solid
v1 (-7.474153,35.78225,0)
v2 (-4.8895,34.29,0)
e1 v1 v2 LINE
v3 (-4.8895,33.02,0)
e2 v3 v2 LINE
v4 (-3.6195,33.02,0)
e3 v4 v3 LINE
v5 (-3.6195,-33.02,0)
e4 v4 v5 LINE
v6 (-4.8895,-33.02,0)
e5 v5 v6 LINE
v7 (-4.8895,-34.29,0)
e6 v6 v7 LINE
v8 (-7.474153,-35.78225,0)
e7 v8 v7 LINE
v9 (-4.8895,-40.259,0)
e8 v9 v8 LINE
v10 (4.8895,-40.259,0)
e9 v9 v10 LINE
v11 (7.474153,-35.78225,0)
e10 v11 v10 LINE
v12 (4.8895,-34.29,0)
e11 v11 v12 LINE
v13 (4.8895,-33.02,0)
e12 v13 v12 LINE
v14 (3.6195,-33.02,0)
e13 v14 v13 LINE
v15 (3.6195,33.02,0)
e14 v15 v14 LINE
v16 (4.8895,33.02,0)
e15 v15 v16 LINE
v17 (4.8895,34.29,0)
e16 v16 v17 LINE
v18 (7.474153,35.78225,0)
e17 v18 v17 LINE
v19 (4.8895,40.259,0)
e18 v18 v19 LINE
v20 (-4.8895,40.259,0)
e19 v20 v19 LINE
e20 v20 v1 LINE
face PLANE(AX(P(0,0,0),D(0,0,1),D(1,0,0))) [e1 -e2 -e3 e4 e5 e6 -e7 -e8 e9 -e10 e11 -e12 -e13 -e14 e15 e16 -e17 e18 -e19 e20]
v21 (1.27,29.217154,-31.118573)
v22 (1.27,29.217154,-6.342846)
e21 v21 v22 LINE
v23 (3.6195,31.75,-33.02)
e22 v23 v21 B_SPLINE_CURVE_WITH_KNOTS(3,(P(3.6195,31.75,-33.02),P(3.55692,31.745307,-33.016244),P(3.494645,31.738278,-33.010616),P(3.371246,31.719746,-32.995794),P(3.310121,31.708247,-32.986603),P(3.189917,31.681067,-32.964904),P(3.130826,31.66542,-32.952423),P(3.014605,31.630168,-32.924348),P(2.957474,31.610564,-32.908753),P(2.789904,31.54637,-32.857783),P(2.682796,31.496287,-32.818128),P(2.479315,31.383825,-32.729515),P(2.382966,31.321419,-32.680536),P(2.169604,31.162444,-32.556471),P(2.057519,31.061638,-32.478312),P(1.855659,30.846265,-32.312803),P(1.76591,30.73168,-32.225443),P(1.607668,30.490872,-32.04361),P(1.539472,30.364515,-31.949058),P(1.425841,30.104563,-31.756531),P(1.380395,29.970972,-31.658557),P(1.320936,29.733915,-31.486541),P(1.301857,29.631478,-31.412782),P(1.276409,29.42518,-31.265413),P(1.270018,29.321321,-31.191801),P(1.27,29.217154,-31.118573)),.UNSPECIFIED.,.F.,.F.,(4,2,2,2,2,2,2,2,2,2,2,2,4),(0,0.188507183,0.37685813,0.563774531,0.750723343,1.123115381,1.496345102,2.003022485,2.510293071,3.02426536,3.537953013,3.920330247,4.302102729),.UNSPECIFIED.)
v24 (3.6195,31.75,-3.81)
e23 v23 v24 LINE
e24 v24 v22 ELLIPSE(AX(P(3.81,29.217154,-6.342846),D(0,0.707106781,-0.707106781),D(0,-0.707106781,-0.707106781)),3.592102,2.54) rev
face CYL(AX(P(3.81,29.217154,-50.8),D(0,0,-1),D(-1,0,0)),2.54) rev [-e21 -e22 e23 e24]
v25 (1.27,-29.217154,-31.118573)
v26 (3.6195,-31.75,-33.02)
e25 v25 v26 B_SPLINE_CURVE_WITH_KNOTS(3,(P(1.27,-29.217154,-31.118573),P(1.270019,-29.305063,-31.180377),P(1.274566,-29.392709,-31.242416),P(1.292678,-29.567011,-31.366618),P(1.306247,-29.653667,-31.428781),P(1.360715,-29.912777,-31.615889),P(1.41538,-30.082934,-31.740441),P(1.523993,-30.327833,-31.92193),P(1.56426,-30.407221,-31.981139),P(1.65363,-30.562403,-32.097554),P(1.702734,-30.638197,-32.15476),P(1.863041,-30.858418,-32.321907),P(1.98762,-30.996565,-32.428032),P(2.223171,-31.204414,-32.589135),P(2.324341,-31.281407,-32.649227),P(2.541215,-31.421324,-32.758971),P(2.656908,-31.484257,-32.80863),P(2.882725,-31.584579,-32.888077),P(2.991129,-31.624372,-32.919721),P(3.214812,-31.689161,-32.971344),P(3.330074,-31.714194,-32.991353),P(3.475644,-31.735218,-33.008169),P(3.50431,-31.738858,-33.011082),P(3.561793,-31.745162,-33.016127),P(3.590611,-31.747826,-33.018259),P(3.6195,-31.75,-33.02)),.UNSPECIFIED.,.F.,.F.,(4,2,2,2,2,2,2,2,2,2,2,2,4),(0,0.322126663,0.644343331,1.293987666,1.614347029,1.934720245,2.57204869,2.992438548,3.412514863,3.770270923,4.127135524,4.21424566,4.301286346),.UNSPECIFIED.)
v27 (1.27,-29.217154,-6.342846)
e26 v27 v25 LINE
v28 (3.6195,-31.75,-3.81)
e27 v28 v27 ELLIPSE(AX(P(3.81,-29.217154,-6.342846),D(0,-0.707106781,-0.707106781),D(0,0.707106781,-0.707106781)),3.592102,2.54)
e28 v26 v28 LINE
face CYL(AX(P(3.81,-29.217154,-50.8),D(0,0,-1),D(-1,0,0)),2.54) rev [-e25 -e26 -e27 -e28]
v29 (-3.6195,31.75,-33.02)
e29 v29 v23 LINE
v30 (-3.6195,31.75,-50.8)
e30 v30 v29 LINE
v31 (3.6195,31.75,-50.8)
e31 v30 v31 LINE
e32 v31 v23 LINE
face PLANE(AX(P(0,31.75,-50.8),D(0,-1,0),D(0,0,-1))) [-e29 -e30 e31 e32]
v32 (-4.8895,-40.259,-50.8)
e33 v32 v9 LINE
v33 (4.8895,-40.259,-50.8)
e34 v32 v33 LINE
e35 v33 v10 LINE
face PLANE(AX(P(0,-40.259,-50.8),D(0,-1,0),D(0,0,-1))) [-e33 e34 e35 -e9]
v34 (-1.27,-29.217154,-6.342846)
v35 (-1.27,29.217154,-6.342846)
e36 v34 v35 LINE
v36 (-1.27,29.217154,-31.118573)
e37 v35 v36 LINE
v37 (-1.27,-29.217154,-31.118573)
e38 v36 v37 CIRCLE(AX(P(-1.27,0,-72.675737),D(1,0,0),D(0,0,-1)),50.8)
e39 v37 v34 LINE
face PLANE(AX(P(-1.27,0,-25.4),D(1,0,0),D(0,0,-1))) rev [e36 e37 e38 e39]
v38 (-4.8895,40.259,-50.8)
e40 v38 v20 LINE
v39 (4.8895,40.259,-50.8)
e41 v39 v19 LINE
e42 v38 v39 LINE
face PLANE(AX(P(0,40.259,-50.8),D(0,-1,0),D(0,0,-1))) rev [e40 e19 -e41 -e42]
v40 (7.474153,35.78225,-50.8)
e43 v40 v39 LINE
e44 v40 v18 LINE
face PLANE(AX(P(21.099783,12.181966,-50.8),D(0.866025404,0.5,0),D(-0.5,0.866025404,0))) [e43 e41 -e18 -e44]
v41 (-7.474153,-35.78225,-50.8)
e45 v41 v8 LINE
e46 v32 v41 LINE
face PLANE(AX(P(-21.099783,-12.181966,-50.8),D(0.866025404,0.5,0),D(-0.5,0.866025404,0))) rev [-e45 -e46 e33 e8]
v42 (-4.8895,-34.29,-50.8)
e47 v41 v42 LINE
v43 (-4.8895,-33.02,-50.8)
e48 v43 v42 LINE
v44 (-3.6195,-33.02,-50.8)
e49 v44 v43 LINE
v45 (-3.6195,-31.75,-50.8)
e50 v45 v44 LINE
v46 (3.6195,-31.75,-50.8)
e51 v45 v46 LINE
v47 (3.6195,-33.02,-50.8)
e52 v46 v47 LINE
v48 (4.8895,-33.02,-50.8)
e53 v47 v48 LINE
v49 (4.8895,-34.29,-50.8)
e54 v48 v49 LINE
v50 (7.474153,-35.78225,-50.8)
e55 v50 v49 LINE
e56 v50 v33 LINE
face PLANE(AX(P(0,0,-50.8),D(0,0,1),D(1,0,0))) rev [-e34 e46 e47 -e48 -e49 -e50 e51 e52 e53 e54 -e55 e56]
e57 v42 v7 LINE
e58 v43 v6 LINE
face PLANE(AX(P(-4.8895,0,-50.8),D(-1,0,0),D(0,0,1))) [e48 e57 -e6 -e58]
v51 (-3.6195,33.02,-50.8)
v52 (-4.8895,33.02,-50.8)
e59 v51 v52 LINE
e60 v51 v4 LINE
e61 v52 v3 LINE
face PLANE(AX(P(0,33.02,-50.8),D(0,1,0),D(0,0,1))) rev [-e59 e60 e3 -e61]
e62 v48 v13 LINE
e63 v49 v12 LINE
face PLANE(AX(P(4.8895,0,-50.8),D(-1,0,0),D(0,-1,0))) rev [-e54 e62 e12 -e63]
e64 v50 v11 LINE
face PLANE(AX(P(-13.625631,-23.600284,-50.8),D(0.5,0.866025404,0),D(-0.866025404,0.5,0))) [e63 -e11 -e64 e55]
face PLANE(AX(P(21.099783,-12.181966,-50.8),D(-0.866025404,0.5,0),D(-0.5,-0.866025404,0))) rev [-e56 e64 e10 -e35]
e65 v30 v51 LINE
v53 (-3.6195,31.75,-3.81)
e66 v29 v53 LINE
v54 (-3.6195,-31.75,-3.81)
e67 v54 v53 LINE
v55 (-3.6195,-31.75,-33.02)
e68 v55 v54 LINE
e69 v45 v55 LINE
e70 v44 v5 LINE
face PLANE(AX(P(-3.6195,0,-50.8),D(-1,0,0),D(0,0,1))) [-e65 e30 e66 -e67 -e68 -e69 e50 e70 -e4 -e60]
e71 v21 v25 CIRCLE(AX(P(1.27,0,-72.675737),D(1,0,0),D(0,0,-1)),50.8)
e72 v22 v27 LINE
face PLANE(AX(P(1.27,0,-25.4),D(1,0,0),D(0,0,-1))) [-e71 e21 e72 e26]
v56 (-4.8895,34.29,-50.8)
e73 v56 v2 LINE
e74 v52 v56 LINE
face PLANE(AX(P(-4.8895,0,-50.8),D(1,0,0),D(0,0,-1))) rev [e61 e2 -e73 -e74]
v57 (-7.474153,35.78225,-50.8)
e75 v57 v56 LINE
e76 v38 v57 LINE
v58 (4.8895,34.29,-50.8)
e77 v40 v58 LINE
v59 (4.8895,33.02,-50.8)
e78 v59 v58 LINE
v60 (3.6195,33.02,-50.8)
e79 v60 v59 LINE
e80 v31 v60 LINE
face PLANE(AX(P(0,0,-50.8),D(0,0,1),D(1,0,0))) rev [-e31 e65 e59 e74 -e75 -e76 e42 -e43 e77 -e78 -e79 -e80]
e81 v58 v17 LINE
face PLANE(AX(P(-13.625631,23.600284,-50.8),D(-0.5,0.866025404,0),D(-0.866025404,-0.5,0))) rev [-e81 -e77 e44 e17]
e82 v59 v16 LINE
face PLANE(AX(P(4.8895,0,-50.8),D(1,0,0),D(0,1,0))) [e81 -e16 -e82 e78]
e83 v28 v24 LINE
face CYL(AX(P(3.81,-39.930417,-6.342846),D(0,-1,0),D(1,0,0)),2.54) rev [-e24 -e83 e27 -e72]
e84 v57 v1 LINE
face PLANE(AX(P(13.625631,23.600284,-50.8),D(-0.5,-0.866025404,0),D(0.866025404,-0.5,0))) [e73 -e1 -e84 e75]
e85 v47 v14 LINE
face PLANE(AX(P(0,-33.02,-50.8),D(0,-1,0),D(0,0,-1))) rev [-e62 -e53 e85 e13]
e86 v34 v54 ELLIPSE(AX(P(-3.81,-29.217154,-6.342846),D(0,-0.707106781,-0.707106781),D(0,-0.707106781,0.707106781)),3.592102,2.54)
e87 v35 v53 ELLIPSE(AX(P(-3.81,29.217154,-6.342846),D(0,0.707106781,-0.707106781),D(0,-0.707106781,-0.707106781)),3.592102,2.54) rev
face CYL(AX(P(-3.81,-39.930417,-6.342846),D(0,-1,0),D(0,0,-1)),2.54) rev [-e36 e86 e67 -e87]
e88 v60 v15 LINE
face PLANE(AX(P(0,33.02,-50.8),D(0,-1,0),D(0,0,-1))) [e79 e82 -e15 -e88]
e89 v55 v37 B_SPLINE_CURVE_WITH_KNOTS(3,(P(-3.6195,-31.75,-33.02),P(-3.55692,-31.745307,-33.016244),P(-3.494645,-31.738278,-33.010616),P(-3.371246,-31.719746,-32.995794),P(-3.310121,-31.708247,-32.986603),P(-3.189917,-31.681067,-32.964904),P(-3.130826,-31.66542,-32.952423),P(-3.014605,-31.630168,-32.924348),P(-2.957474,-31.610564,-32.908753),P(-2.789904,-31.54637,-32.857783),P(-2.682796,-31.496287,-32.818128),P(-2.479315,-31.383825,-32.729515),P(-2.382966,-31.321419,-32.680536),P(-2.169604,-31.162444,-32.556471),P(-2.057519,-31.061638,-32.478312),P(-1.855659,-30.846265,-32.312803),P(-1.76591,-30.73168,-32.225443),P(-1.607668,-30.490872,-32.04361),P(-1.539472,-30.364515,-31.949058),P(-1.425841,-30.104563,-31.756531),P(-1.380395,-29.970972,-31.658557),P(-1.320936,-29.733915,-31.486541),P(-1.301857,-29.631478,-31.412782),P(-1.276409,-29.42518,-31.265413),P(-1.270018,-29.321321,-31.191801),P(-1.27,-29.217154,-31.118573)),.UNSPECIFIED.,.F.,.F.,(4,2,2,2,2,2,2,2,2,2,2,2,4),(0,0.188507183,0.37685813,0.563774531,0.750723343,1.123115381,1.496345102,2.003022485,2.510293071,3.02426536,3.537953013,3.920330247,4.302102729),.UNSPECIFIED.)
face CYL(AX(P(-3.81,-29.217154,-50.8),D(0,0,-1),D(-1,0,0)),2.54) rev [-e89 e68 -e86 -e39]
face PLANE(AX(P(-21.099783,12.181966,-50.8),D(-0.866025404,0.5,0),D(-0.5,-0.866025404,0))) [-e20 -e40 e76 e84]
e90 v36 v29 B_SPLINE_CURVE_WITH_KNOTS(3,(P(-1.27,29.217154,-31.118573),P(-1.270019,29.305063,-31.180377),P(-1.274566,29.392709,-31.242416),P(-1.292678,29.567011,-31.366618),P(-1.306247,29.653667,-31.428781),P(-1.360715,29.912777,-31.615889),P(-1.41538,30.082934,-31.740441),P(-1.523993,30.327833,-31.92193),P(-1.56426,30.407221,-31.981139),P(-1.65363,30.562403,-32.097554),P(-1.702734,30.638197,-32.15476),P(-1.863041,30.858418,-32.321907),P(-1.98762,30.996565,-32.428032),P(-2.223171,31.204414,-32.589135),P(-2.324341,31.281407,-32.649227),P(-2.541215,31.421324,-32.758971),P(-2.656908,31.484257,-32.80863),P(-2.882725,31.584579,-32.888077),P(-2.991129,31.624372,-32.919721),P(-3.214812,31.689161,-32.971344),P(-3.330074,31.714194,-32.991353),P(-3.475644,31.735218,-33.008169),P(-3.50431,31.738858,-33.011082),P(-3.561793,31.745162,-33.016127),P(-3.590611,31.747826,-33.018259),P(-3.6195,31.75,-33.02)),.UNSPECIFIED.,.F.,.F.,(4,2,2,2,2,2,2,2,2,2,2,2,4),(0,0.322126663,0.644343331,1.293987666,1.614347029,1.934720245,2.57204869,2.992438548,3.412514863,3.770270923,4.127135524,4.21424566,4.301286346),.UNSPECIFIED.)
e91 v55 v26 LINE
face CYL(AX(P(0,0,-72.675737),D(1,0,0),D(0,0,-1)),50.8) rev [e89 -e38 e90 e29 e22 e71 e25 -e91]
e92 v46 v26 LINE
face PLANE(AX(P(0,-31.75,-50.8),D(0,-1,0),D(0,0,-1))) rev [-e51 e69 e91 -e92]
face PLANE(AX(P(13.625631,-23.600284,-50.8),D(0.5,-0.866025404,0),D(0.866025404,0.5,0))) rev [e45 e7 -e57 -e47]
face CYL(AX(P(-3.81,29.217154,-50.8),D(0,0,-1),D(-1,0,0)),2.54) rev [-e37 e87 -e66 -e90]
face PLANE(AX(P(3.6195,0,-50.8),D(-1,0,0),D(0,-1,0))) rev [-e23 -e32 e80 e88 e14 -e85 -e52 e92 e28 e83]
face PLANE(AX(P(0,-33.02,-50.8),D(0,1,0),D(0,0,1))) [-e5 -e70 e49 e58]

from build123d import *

# Parameters (mm, degrees)
BOSS_EXTRUDE1_DEPTH = 50.8
SKETCH2_W           = 7.239
SKETCH2_H           = 3.81
BOSS_EXTRUDE2_DEPTH = 63.5
RIB1_START          = -1.27
RIB1_DEPTH          = 2.54
FILLET1_R           = 2.54


# Read off the part's stored shape, not the designer's step: Rib1
with BuildPart() as part:
    # Sketch1 → Boss-Extrude1 (new body)
    with BuildSketch(Plane.XY):
        Polygon((3.6195, -31.75), (0, -31.75), (-3.6195, -31.75), (-3.6195, -33.02), (-4.8895, -33.02), (-4.8895, -34.29), (-4.8895, -40.259), (4.8895, -40.259), (4.8895, -34.29), (4.8895, -33.02), (3.6195, -33.02), align=None)
        Polygon((-4.8895, -40.259), (-4.8895, -34.29), (-7.474152818, -35.78225), align=None)
        Polygon((7.474152818, -35.78225), (4.8895, -34.29), (4.8895, -40.259), align=None)
        Polygon((-3.6195, 33.02), (-3.6195, 31.75), (0, 31.75), (3.6195, 31.75), (3.6195, 33.02), (4.8895, 33.02), (4.8895, 34.29), (4.8895, 40.259), (-4.8895, 40.259), (-4.8895, 34.29), (-4.8895, 33.02), align=None)
        Polygon((-7.474152818, 35.78225), (-4.8895, 34.29), (-4.8895, 40.259), align=None)
        Polygon((7.474152818, 35.78225), (4.8895, 40.259), (4.8895, 34.29), align=None)
    extrude(amount=-BOSS_EXTRUDE1_DEPTH)

    # Sketch2 → Boss-Extrude2 (add)
    with BuildSketch(Plane.XZ.offset(-31.75)):
        with Locations((0, -1.905)):
            Rectangle(SKETCH2_W, SKETCH2_H)
    extrude(amount=BOSS_EXTRUDE2_DEPTH)

    # Rib1 outline → Rib1 (add)
    with BuildSketch(Plane(origin=(0, 0, 0), x_dir=(0, 0, -1), z_dir=(1, 0, 0)).offset(RIB1_START)):
        with BuildLine():
            ThreePointArc((33.02, -31.75), (21.87573729, 0), (33.02, 31.75))
            Line((33.02, 31.75), (3.81, 31.75))
            Line((3.81, 31.75), (3.81, -31.75))
            Line((3.81, -31.75), (33.02, -31.75))
        make_face()
    extrude(amount=RIB1_DEPTH)

    # Fillet1
    # the kernel refuses this fillet: 2.54 mm, written as the material it adds along each edge
    with BuildSketch(Plane(origin=(-1.27, 31.75, -39.352115439), x_dir=(-1, 0, 0), z_dir=(0, 0, 1))) as fillet1_piece_1_section:
        with BuildLine():
            CenterArc((2.54, 2.532846176), FILLET1_R, 180, 85.698777695)
            Line((0, 2.532846176), (0, 0))
            Line((0, 0), (2.3495, 0))
        make_face()
    fillet1_piece_1 = extrude(amount=35.542115439, mode=Mode.PRIVATE)
    fillet1_piece_1 = fillet1_piece_1 - Plane(origin=(-1.944090085, 0, -72.675737291), x_dir=(0, -0.6249999999925505, 0.7806247498057642), z_dir=(-1, 0, 0)) * Cylinder(50.800000001, 82, mode=Mode.PRIVATE)
    add(fillet1_piece_1)
    with BuildSketch(Plane(origin=(-1.27, 38.082115439, -3.81), x_dir=(-1, 0, 0), z_dir=(0, -1, 0))) as fillet1_piece_2:
        with BuildLine():
            CenterArc((2.54, 2.532846176), FILLET1_R, 180, 85.698777695)
            Line((0, 2.532846176), (0, 0))
            Line((0, 0), (2.3495, 0))
        make_face()
    extrude(amount=76.164230879)
    with BuildSketch(Plane(origin=(-1.27, -31.75, -3.81), x_dir=(-1, 0, 0), z_dir=(0, 0, -1))) as fillet1_piece_3_section:
        with BuildLine():
            CenterArc((2.54, 2.532846176), FILLET1_R, 180, 85.698777695)
            Line((0, 2.532846176), (0, 0))
            Line((0, 0), (2.3495, 0))
        make_face()
    fillet1_piece_3 = extrude(amount=35.542115439, mode=Mode.PRIVATE)
    fillet1_piece_3 = fillet1_piece_3 - Plane(origin=(-1.944090085, 0, -72.675737291), x_dir=(0, -0.6249999999925505, 0.7806247498057642), z_dir=(-1, 0, 0)) * Cylinder(50.800000001, 82, mode=Mode.PRIVATE)
    add(fillet1_piece_3)
    with BuildSketch(Plane(origin=(1.27, 31.75, -39.352115439), x_dir=(1, 0, 0), z_dir=(0, 0, 1))) as fillet1_piece_4_section:
        with BuildLine():
            CenterArc((2.54, -2.532846176), FILLET1_R, 94.301222305, 85.698777695)
            Line((0, -2.532846176), (0, 0))
            Line((0, 0), (2.3495, 0))
        make_face()
    fillet1_piece_4 = extrude(amount=35.542115439, mode=Mode.PRIVATE)
    fillet1_piece_4 = fillet1_piece_4 - Plane(origin=(1.944090085, 0, -72.675737291), x_dir=(0, -0.6249999999925505, 0.7806247498057642), z_dir=(-1, 0, 0)) * Cylinder(50.800000001, 82, mode=Mode.PRIVATE)
    add(fillet1_piece_4)
    with BuildSketch(Plane(origin=(1.27, -31.75, -3.81), x_dir=(1, 0, 0), z_dir=(0, 0, -1))) as fillet1_piece_5_section:
        with BuildLine():
            CenterArc((2.54, -2.532846176), FILLET1_R, 94.301222305, 85.698777695)
            Line((0, -2.532846176), (0, 0))
            Line((0, 0), (2.3495, 0))
        make_face()
    fillet1_piece_5 = extrude(amount=35.542115439, mode=Mode.PRIVATE)
    fillet1_piece_5 = fillet1_piece_5 - Plane(origin=(1.944090085, 0, -72.675737291), x_dir=(0, -0.6249999999925505, 0.7806247498057642), z_dir=(-1, 0, 0)) * Cylinder(50.800000001, 82, mode=Mode.PRIVATE)
    add(fillet1_piece_5)
    with BuildSketch(Plane(origin=(1.27, 38.082115439, -3.81), x_dir=(0, 0, -1), z_dir=(0, -1, 0))) as fillet1_piece_6:
        with BuildLine():
            CenterArc((2.532846176, 2.54), FILLET1_R, 184.301222305, 85.698777695)
            Line((0, 2.3495), (0, 0))
            Line((0, 0), (2.532846176, 0))
        make_face()
    extrude(amount=76.164230879)


solid = part.part
